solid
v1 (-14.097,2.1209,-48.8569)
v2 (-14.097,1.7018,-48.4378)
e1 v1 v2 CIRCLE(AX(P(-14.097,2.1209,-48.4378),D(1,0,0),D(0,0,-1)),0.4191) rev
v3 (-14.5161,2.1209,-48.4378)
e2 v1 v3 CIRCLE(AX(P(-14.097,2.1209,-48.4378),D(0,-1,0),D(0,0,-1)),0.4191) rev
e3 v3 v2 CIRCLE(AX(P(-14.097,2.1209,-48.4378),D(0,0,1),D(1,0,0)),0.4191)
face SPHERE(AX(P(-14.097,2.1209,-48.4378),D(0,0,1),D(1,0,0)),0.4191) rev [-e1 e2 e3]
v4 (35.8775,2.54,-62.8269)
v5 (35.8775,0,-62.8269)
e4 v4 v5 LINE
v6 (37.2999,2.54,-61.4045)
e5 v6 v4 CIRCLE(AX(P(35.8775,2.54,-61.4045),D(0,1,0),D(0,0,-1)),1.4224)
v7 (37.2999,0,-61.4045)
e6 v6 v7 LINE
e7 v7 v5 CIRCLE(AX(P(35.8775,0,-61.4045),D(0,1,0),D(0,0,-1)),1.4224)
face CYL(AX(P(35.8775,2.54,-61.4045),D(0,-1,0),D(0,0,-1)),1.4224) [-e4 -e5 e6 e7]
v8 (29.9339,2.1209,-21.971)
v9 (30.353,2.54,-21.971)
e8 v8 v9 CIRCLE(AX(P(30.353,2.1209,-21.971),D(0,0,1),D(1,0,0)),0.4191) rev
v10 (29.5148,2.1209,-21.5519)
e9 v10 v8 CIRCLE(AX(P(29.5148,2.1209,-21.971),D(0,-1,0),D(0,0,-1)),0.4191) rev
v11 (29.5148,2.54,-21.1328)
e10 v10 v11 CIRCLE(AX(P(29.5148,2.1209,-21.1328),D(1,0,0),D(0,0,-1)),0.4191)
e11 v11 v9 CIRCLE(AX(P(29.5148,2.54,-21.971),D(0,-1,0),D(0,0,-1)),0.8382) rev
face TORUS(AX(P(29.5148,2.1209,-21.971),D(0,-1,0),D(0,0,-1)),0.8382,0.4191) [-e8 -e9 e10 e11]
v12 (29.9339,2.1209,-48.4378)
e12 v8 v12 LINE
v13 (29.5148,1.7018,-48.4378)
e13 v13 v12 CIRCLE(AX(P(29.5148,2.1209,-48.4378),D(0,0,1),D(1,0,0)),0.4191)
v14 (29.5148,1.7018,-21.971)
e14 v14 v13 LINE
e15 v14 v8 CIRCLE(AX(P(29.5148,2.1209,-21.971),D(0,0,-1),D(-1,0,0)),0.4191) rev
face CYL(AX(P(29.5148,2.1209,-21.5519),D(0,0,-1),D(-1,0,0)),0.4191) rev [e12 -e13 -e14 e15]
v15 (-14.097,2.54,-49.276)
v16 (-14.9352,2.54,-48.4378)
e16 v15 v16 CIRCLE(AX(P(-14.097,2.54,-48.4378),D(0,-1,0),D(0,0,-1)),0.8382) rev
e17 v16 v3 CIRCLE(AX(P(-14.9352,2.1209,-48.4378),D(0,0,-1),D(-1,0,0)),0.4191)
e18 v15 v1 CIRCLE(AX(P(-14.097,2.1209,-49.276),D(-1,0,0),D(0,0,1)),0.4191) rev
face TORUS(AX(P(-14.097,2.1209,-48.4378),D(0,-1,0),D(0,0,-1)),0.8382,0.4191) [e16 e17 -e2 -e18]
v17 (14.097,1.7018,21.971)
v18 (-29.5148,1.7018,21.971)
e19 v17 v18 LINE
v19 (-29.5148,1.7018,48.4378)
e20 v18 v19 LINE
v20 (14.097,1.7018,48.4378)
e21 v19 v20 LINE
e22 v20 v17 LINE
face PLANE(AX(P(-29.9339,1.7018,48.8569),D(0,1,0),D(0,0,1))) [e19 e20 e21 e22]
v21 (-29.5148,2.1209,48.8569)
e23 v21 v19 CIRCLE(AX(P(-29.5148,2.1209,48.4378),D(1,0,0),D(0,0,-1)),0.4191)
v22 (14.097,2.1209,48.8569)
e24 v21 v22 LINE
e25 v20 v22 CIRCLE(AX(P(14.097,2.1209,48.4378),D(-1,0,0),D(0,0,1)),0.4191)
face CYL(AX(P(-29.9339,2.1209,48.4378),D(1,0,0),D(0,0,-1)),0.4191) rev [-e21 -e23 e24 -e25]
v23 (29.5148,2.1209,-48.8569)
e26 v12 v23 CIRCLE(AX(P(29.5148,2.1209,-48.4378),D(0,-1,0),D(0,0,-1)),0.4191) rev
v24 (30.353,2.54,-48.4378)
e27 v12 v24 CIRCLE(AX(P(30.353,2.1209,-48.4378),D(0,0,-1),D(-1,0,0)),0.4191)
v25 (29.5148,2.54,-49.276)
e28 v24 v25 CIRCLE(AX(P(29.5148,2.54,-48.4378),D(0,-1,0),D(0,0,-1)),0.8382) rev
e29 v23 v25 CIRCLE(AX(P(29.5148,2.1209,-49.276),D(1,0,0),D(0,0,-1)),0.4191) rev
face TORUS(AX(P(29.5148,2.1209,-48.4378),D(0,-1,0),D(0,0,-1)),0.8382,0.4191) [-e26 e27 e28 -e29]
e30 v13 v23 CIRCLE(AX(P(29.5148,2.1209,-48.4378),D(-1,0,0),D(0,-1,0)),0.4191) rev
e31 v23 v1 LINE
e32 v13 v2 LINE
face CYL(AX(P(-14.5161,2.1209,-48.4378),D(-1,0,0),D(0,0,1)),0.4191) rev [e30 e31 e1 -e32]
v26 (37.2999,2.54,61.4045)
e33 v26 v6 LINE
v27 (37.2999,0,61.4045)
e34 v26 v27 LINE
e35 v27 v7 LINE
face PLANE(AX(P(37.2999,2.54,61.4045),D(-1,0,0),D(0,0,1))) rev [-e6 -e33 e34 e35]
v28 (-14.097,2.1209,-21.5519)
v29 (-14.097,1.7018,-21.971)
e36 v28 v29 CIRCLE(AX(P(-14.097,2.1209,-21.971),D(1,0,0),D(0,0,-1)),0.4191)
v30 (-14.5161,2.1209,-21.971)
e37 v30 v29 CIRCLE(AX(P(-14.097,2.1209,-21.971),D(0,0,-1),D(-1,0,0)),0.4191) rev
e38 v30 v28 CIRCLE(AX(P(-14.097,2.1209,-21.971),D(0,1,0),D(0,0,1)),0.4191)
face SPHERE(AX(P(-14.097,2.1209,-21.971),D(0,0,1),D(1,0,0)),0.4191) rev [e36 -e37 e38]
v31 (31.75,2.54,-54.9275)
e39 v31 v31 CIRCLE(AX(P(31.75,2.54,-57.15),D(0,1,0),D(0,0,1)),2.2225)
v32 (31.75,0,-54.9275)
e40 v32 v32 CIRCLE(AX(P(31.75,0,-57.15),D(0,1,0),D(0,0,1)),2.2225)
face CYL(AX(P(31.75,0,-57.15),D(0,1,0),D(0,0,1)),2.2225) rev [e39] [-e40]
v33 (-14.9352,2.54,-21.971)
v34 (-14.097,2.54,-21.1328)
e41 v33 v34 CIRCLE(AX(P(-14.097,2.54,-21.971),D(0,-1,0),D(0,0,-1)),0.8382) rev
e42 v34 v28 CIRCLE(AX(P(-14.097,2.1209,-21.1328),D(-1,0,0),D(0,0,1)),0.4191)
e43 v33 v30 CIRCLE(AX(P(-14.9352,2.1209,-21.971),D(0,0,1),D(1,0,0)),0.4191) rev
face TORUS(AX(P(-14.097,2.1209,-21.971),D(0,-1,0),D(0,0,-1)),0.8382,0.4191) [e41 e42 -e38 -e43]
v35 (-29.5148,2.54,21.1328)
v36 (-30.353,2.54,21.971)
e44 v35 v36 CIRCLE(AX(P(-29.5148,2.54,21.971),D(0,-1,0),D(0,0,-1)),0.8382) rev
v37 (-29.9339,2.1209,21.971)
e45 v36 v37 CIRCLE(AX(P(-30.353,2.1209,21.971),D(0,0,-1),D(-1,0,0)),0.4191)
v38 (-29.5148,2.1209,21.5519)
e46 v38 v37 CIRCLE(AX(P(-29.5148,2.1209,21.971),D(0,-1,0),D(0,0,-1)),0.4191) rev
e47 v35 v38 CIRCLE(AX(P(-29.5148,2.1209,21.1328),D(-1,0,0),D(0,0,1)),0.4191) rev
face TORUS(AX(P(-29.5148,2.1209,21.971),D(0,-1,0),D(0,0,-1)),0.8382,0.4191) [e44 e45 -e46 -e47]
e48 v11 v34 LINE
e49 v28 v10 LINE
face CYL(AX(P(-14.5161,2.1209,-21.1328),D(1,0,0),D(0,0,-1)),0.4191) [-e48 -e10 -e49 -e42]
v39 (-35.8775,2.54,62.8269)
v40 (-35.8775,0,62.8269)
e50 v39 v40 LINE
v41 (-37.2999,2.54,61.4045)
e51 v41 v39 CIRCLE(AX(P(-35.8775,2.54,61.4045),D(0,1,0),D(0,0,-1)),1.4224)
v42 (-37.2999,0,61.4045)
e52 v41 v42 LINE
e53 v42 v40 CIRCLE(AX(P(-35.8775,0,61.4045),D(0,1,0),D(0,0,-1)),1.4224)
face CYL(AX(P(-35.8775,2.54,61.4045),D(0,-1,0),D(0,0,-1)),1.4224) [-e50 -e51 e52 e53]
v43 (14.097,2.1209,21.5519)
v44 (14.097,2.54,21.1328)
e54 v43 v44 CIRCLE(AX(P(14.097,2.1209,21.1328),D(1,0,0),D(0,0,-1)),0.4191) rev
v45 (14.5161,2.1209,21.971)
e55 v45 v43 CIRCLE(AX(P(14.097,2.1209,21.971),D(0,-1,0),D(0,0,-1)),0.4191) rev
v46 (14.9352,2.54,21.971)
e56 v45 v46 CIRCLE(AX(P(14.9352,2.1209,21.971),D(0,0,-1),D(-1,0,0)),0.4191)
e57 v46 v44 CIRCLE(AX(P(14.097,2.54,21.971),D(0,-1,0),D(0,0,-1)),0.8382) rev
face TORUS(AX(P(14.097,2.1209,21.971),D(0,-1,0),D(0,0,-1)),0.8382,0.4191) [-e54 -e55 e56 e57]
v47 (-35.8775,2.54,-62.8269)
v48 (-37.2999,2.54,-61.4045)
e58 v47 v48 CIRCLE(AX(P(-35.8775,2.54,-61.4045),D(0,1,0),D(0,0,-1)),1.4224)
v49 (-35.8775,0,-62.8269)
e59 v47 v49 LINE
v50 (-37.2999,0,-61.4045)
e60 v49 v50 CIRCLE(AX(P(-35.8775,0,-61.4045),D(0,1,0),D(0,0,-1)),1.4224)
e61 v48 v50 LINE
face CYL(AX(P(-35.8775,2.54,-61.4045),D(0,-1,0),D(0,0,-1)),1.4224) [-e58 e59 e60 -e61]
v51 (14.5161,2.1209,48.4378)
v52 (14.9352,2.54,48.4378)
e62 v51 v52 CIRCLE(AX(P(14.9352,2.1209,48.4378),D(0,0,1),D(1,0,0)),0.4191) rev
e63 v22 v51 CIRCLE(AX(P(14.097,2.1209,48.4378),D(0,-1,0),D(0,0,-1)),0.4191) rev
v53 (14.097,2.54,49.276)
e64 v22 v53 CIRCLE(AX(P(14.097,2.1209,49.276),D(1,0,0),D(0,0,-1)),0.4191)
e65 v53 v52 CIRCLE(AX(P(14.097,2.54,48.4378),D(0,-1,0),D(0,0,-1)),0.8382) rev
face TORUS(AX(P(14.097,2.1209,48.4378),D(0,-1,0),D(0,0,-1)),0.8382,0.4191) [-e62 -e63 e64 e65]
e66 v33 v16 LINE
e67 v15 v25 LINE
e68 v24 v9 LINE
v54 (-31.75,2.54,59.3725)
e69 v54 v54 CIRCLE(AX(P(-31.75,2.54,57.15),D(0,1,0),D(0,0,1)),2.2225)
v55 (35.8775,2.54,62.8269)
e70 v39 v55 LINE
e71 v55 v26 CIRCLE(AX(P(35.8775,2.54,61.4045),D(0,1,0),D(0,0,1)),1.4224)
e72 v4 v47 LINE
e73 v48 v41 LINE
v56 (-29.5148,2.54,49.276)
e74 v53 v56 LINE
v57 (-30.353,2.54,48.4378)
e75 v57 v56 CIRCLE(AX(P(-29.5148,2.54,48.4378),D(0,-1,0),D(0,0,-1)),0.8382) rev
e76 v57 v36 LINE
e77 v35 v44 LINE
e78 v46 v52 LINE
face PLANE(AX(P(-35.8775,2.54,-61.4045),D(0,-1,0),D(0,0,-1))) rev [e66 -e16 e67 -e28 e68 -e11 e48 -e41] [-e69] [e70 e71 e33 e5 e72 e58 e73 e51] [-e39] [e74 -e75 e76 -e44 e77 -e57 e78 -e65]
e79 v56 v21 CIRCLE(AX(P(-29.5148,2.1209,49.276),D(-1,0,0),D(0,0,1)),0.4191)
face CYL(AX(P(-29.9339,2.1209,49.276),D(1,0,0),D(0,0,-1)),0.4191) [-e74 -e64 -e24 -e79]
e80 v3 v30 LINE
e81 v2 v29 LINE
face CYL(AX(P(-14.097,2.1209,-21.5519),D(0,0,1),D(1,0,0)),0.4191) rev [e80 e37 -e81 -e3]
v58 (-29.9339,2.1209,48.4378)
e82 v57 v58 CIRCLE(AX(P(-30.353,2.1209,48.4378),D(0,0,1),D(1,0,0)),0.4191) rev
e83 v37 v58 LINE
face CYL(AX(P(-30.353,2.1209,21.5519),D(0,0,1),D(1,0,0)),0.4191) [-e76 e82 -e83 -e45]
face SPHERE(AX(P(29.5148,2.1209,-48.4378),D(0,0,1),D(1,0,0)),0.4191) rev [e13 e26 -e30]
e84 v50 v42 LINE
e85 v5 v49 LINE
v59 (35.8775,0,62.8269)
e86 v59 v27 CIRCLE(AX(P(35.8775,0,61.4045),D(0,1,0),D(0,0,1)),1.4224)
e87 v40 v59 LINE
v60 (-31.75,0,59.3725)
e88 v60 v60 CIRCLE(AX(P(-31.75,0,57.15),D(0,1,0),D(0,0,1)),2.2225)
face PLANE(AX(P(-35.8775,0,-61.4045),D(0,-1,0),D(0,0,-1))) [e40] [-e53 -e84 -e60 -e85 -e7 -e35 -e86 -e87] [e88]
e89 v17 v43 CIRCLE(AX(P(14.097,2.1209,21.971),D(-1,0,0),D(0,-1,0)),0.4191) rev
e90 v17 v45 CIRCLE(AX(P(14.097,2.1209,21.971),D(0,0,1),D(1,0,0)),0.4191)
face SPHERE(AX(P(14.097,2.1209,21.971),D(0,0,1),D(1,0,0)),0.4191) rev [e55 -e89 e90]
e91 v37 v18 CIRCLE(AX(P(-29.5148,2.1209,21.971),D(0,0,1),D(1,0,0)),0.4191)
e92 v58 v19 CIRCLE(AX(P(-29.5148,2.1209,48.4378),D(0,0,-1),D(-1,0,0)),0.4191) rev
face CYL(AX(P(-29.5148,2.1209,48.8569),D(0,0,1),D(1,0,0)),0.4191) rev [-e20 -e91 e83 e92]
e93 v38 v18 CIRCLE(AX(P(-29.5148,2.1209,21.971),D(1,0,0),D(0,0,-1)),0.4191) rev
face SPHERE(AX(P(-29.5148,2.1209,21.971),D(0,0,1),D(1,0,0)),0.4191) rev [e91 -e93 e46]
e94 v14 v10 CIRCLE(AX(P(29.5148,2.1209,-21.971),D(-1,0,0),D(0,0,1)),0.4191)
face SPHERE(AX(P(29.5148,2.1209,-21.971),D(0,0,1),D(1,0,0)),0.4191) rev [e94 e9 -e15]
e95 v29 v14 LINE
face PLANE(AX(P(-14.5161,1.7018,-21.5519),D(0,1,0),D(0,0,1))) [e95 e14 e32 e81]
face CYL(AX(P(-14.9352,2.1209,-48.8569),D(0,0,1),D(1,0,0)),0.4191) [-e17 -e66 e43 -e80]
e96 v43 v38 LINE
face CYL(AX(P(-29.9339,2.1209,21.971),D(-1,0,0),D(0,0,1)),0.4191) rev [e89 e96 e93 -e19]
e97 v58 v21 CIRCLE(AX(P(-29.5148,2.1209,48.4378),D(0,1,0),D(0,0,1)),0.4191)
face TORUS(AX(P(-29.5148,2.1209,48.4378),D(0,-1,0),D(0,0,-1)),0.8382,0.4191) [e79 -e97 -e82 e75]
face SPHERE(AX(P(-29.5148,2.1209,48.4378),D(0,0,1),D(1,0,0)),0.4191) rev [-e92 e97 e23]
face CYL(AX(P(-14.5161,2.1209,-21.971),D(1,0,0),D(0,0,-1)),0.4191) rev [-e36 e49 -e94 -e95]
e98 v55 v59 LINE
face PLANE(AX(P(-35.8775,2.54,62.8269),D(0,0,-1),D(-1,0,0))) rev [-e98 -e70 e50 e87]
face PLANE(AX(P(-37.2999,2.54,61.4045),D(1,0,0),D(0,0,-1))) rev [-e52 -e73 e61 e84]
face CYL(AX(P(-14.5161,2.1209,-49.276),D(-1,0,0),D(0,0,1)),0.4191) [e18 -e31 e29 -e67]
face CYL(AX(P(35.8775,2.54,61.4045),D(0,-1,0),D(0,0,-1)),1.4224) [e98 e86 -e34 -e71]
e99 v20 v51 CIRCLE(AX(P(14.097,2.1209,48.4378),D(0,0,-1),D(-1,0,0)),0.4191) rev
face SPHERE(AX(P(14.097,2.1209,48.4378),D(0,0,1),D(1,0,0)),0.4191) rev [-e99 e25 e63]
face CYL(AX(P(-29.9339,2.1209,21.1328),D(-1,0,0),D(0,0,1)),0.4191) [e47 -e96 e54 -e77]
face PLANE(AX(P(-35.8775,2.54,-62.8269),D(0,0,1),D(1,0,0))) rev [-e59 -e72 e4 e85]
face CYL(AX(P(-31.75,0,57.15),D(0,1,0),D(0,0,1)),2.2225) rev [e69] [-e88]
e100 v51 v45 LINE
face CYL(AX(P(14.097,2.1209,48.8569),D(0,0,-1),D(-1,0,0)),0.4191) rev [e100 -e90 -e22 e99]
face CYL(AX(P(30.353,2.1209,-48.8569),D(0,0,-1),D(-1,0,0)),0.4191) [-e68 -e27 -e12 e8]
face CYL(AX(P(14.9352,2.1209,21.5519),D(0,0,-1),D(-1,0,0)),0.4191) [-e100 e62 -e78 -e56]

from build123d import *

# Parameters (mm, degrees)
EXTRUDE1_DEPTH     = 2.54
SKETCH2_W          = 44.45
SKETCH2_H          = 27.305
EXTRUDE2_DEPTH     = 0.8382
FILLET1_R          = 0.4191
SKETCH3_R          = 2.2225
CUT_EXTRUDE1_DEPTH = 74.109188914


with BuildPart() as part:
    # Sketch1 → Extrude1 (new body)
    with BuildSketch(Plane(origin=(0, 0, 0), x_dir=(1, 0, 0), z_dir=(0, 1, 0))):
        with BuildLine():
            Line((-35.8775, -62.8269), (35.8775, -62.8269))
            ThreePointArc((35.8775, -62.8269), (36.883288686, -62.410288686), (37.2999, -61.4045))
            Line((37.2999, -61.4045), (37.2999, 61.4045))
            ThreePointArc((37.2999, 61.4045), (36.883288686, 62.410288686), (35.8775, 62.8269))
            Line((35.8775, 62.8269), (-35.8775, 62.8269))
            ThreePointArc((-35.8775, 62.8269), (-36.883288686, 62.410288686), (-37.2999, 61.4045))
            Line((-37.2999, 61.4045), (-37.2999, -61.4045))
            ThreePointArc((-37.2999, -61.4045), (-36.883288686, -62.410288686), (-35.8775, -62.8269))
        make_face()
    extrude(amount=EXTRUDE1_DEPTH)

    # Sketch2 → Extrude2 (cut)
    with BuildSketch(Plane(origin=(0, 2.54, 0), x_dir=(1, 0, 0), z_dir=(0, 1, 0))):
        with Locations((7.7089, 35.2044)):
            Rectangle(SKETCH2_W, SKETCH2_H)
        with Locations((-7.7089, -35.2044)):
            Rectangle(SKETCH2_W, SKETCH2_H)
    extrude(amount=-EXTRUDE2_DEPTH, mode=Mode.SUBTRACT)

    # Fillet1
    fillet1_edges = [part.edges().sort_by_distance(p)[0] for p in [
        (-14.5161, 1.7018, -35.2044),
        (-14.5161, 2.1209, -21.5519),
        (7.7089, 1.7018, -48.8569),
        (-14.5161, 2.1209, -48.8569),
        (29.9339, 1.7018, -35.2044),
        (29.9339, 2.1209, -48.8569),
        (7.7089, 1.7018, -21.5519),
        (29.9339, 2.1209, -21.5519),
        (-14.5161, 2.54, -35.2044),
        (7.7089, 2.54, -21.5519),
        (29.9339, 2.54, -35.2044),
        (7.7089, 2.54, -48.8569),
        (-29.9339, 1.7018, 35.2044),
        (-29.9339, 2.1209, 48.8569),
        (-7.7089, 1.7018, 21.5519),
        (-29.9339, 2.1209, 21.5519),
        (14.5161, 1.7018, 35.2044),
        (14.5161, 2.1209, 21.5519),
        (-7.7089, 1.7018, 48.8569),
        (14.5161, 2.1209, 48.8569),
        (-29.9339, 2.54, 35.2044),
        (-7.7089, 2.54, 48.8569),
        (14.5161, 2.54, 35.2044),
        (-7.7089, 2.54, 21.5519),
    ]]
    fillet(fillet1_edges, radius=FILLET1_R - 0.0001)  # a hair under: the kernel refuses the full size

    # Sketch3 → Cut-Extrude1 (cut, through all)
    with BuildSketch(Plane(origin=(0, 2.54, 0), x_dir=(1, 0, 0), z_dir=(0, 1, 0))):
        with Locations(Location((31.75, 57.15, 0), (0, 0, 270))):
            Circle(SKETCH3_R)
        with Locations(Location((-31.75, -57.15, 0), (0, 0, 270))):
            Circle(SKETCH3_R)
    extrude(amount=-CUT_EXTRUDE1_DEPTH, mode=Mode.SUBTRACT)


solid = part.part
